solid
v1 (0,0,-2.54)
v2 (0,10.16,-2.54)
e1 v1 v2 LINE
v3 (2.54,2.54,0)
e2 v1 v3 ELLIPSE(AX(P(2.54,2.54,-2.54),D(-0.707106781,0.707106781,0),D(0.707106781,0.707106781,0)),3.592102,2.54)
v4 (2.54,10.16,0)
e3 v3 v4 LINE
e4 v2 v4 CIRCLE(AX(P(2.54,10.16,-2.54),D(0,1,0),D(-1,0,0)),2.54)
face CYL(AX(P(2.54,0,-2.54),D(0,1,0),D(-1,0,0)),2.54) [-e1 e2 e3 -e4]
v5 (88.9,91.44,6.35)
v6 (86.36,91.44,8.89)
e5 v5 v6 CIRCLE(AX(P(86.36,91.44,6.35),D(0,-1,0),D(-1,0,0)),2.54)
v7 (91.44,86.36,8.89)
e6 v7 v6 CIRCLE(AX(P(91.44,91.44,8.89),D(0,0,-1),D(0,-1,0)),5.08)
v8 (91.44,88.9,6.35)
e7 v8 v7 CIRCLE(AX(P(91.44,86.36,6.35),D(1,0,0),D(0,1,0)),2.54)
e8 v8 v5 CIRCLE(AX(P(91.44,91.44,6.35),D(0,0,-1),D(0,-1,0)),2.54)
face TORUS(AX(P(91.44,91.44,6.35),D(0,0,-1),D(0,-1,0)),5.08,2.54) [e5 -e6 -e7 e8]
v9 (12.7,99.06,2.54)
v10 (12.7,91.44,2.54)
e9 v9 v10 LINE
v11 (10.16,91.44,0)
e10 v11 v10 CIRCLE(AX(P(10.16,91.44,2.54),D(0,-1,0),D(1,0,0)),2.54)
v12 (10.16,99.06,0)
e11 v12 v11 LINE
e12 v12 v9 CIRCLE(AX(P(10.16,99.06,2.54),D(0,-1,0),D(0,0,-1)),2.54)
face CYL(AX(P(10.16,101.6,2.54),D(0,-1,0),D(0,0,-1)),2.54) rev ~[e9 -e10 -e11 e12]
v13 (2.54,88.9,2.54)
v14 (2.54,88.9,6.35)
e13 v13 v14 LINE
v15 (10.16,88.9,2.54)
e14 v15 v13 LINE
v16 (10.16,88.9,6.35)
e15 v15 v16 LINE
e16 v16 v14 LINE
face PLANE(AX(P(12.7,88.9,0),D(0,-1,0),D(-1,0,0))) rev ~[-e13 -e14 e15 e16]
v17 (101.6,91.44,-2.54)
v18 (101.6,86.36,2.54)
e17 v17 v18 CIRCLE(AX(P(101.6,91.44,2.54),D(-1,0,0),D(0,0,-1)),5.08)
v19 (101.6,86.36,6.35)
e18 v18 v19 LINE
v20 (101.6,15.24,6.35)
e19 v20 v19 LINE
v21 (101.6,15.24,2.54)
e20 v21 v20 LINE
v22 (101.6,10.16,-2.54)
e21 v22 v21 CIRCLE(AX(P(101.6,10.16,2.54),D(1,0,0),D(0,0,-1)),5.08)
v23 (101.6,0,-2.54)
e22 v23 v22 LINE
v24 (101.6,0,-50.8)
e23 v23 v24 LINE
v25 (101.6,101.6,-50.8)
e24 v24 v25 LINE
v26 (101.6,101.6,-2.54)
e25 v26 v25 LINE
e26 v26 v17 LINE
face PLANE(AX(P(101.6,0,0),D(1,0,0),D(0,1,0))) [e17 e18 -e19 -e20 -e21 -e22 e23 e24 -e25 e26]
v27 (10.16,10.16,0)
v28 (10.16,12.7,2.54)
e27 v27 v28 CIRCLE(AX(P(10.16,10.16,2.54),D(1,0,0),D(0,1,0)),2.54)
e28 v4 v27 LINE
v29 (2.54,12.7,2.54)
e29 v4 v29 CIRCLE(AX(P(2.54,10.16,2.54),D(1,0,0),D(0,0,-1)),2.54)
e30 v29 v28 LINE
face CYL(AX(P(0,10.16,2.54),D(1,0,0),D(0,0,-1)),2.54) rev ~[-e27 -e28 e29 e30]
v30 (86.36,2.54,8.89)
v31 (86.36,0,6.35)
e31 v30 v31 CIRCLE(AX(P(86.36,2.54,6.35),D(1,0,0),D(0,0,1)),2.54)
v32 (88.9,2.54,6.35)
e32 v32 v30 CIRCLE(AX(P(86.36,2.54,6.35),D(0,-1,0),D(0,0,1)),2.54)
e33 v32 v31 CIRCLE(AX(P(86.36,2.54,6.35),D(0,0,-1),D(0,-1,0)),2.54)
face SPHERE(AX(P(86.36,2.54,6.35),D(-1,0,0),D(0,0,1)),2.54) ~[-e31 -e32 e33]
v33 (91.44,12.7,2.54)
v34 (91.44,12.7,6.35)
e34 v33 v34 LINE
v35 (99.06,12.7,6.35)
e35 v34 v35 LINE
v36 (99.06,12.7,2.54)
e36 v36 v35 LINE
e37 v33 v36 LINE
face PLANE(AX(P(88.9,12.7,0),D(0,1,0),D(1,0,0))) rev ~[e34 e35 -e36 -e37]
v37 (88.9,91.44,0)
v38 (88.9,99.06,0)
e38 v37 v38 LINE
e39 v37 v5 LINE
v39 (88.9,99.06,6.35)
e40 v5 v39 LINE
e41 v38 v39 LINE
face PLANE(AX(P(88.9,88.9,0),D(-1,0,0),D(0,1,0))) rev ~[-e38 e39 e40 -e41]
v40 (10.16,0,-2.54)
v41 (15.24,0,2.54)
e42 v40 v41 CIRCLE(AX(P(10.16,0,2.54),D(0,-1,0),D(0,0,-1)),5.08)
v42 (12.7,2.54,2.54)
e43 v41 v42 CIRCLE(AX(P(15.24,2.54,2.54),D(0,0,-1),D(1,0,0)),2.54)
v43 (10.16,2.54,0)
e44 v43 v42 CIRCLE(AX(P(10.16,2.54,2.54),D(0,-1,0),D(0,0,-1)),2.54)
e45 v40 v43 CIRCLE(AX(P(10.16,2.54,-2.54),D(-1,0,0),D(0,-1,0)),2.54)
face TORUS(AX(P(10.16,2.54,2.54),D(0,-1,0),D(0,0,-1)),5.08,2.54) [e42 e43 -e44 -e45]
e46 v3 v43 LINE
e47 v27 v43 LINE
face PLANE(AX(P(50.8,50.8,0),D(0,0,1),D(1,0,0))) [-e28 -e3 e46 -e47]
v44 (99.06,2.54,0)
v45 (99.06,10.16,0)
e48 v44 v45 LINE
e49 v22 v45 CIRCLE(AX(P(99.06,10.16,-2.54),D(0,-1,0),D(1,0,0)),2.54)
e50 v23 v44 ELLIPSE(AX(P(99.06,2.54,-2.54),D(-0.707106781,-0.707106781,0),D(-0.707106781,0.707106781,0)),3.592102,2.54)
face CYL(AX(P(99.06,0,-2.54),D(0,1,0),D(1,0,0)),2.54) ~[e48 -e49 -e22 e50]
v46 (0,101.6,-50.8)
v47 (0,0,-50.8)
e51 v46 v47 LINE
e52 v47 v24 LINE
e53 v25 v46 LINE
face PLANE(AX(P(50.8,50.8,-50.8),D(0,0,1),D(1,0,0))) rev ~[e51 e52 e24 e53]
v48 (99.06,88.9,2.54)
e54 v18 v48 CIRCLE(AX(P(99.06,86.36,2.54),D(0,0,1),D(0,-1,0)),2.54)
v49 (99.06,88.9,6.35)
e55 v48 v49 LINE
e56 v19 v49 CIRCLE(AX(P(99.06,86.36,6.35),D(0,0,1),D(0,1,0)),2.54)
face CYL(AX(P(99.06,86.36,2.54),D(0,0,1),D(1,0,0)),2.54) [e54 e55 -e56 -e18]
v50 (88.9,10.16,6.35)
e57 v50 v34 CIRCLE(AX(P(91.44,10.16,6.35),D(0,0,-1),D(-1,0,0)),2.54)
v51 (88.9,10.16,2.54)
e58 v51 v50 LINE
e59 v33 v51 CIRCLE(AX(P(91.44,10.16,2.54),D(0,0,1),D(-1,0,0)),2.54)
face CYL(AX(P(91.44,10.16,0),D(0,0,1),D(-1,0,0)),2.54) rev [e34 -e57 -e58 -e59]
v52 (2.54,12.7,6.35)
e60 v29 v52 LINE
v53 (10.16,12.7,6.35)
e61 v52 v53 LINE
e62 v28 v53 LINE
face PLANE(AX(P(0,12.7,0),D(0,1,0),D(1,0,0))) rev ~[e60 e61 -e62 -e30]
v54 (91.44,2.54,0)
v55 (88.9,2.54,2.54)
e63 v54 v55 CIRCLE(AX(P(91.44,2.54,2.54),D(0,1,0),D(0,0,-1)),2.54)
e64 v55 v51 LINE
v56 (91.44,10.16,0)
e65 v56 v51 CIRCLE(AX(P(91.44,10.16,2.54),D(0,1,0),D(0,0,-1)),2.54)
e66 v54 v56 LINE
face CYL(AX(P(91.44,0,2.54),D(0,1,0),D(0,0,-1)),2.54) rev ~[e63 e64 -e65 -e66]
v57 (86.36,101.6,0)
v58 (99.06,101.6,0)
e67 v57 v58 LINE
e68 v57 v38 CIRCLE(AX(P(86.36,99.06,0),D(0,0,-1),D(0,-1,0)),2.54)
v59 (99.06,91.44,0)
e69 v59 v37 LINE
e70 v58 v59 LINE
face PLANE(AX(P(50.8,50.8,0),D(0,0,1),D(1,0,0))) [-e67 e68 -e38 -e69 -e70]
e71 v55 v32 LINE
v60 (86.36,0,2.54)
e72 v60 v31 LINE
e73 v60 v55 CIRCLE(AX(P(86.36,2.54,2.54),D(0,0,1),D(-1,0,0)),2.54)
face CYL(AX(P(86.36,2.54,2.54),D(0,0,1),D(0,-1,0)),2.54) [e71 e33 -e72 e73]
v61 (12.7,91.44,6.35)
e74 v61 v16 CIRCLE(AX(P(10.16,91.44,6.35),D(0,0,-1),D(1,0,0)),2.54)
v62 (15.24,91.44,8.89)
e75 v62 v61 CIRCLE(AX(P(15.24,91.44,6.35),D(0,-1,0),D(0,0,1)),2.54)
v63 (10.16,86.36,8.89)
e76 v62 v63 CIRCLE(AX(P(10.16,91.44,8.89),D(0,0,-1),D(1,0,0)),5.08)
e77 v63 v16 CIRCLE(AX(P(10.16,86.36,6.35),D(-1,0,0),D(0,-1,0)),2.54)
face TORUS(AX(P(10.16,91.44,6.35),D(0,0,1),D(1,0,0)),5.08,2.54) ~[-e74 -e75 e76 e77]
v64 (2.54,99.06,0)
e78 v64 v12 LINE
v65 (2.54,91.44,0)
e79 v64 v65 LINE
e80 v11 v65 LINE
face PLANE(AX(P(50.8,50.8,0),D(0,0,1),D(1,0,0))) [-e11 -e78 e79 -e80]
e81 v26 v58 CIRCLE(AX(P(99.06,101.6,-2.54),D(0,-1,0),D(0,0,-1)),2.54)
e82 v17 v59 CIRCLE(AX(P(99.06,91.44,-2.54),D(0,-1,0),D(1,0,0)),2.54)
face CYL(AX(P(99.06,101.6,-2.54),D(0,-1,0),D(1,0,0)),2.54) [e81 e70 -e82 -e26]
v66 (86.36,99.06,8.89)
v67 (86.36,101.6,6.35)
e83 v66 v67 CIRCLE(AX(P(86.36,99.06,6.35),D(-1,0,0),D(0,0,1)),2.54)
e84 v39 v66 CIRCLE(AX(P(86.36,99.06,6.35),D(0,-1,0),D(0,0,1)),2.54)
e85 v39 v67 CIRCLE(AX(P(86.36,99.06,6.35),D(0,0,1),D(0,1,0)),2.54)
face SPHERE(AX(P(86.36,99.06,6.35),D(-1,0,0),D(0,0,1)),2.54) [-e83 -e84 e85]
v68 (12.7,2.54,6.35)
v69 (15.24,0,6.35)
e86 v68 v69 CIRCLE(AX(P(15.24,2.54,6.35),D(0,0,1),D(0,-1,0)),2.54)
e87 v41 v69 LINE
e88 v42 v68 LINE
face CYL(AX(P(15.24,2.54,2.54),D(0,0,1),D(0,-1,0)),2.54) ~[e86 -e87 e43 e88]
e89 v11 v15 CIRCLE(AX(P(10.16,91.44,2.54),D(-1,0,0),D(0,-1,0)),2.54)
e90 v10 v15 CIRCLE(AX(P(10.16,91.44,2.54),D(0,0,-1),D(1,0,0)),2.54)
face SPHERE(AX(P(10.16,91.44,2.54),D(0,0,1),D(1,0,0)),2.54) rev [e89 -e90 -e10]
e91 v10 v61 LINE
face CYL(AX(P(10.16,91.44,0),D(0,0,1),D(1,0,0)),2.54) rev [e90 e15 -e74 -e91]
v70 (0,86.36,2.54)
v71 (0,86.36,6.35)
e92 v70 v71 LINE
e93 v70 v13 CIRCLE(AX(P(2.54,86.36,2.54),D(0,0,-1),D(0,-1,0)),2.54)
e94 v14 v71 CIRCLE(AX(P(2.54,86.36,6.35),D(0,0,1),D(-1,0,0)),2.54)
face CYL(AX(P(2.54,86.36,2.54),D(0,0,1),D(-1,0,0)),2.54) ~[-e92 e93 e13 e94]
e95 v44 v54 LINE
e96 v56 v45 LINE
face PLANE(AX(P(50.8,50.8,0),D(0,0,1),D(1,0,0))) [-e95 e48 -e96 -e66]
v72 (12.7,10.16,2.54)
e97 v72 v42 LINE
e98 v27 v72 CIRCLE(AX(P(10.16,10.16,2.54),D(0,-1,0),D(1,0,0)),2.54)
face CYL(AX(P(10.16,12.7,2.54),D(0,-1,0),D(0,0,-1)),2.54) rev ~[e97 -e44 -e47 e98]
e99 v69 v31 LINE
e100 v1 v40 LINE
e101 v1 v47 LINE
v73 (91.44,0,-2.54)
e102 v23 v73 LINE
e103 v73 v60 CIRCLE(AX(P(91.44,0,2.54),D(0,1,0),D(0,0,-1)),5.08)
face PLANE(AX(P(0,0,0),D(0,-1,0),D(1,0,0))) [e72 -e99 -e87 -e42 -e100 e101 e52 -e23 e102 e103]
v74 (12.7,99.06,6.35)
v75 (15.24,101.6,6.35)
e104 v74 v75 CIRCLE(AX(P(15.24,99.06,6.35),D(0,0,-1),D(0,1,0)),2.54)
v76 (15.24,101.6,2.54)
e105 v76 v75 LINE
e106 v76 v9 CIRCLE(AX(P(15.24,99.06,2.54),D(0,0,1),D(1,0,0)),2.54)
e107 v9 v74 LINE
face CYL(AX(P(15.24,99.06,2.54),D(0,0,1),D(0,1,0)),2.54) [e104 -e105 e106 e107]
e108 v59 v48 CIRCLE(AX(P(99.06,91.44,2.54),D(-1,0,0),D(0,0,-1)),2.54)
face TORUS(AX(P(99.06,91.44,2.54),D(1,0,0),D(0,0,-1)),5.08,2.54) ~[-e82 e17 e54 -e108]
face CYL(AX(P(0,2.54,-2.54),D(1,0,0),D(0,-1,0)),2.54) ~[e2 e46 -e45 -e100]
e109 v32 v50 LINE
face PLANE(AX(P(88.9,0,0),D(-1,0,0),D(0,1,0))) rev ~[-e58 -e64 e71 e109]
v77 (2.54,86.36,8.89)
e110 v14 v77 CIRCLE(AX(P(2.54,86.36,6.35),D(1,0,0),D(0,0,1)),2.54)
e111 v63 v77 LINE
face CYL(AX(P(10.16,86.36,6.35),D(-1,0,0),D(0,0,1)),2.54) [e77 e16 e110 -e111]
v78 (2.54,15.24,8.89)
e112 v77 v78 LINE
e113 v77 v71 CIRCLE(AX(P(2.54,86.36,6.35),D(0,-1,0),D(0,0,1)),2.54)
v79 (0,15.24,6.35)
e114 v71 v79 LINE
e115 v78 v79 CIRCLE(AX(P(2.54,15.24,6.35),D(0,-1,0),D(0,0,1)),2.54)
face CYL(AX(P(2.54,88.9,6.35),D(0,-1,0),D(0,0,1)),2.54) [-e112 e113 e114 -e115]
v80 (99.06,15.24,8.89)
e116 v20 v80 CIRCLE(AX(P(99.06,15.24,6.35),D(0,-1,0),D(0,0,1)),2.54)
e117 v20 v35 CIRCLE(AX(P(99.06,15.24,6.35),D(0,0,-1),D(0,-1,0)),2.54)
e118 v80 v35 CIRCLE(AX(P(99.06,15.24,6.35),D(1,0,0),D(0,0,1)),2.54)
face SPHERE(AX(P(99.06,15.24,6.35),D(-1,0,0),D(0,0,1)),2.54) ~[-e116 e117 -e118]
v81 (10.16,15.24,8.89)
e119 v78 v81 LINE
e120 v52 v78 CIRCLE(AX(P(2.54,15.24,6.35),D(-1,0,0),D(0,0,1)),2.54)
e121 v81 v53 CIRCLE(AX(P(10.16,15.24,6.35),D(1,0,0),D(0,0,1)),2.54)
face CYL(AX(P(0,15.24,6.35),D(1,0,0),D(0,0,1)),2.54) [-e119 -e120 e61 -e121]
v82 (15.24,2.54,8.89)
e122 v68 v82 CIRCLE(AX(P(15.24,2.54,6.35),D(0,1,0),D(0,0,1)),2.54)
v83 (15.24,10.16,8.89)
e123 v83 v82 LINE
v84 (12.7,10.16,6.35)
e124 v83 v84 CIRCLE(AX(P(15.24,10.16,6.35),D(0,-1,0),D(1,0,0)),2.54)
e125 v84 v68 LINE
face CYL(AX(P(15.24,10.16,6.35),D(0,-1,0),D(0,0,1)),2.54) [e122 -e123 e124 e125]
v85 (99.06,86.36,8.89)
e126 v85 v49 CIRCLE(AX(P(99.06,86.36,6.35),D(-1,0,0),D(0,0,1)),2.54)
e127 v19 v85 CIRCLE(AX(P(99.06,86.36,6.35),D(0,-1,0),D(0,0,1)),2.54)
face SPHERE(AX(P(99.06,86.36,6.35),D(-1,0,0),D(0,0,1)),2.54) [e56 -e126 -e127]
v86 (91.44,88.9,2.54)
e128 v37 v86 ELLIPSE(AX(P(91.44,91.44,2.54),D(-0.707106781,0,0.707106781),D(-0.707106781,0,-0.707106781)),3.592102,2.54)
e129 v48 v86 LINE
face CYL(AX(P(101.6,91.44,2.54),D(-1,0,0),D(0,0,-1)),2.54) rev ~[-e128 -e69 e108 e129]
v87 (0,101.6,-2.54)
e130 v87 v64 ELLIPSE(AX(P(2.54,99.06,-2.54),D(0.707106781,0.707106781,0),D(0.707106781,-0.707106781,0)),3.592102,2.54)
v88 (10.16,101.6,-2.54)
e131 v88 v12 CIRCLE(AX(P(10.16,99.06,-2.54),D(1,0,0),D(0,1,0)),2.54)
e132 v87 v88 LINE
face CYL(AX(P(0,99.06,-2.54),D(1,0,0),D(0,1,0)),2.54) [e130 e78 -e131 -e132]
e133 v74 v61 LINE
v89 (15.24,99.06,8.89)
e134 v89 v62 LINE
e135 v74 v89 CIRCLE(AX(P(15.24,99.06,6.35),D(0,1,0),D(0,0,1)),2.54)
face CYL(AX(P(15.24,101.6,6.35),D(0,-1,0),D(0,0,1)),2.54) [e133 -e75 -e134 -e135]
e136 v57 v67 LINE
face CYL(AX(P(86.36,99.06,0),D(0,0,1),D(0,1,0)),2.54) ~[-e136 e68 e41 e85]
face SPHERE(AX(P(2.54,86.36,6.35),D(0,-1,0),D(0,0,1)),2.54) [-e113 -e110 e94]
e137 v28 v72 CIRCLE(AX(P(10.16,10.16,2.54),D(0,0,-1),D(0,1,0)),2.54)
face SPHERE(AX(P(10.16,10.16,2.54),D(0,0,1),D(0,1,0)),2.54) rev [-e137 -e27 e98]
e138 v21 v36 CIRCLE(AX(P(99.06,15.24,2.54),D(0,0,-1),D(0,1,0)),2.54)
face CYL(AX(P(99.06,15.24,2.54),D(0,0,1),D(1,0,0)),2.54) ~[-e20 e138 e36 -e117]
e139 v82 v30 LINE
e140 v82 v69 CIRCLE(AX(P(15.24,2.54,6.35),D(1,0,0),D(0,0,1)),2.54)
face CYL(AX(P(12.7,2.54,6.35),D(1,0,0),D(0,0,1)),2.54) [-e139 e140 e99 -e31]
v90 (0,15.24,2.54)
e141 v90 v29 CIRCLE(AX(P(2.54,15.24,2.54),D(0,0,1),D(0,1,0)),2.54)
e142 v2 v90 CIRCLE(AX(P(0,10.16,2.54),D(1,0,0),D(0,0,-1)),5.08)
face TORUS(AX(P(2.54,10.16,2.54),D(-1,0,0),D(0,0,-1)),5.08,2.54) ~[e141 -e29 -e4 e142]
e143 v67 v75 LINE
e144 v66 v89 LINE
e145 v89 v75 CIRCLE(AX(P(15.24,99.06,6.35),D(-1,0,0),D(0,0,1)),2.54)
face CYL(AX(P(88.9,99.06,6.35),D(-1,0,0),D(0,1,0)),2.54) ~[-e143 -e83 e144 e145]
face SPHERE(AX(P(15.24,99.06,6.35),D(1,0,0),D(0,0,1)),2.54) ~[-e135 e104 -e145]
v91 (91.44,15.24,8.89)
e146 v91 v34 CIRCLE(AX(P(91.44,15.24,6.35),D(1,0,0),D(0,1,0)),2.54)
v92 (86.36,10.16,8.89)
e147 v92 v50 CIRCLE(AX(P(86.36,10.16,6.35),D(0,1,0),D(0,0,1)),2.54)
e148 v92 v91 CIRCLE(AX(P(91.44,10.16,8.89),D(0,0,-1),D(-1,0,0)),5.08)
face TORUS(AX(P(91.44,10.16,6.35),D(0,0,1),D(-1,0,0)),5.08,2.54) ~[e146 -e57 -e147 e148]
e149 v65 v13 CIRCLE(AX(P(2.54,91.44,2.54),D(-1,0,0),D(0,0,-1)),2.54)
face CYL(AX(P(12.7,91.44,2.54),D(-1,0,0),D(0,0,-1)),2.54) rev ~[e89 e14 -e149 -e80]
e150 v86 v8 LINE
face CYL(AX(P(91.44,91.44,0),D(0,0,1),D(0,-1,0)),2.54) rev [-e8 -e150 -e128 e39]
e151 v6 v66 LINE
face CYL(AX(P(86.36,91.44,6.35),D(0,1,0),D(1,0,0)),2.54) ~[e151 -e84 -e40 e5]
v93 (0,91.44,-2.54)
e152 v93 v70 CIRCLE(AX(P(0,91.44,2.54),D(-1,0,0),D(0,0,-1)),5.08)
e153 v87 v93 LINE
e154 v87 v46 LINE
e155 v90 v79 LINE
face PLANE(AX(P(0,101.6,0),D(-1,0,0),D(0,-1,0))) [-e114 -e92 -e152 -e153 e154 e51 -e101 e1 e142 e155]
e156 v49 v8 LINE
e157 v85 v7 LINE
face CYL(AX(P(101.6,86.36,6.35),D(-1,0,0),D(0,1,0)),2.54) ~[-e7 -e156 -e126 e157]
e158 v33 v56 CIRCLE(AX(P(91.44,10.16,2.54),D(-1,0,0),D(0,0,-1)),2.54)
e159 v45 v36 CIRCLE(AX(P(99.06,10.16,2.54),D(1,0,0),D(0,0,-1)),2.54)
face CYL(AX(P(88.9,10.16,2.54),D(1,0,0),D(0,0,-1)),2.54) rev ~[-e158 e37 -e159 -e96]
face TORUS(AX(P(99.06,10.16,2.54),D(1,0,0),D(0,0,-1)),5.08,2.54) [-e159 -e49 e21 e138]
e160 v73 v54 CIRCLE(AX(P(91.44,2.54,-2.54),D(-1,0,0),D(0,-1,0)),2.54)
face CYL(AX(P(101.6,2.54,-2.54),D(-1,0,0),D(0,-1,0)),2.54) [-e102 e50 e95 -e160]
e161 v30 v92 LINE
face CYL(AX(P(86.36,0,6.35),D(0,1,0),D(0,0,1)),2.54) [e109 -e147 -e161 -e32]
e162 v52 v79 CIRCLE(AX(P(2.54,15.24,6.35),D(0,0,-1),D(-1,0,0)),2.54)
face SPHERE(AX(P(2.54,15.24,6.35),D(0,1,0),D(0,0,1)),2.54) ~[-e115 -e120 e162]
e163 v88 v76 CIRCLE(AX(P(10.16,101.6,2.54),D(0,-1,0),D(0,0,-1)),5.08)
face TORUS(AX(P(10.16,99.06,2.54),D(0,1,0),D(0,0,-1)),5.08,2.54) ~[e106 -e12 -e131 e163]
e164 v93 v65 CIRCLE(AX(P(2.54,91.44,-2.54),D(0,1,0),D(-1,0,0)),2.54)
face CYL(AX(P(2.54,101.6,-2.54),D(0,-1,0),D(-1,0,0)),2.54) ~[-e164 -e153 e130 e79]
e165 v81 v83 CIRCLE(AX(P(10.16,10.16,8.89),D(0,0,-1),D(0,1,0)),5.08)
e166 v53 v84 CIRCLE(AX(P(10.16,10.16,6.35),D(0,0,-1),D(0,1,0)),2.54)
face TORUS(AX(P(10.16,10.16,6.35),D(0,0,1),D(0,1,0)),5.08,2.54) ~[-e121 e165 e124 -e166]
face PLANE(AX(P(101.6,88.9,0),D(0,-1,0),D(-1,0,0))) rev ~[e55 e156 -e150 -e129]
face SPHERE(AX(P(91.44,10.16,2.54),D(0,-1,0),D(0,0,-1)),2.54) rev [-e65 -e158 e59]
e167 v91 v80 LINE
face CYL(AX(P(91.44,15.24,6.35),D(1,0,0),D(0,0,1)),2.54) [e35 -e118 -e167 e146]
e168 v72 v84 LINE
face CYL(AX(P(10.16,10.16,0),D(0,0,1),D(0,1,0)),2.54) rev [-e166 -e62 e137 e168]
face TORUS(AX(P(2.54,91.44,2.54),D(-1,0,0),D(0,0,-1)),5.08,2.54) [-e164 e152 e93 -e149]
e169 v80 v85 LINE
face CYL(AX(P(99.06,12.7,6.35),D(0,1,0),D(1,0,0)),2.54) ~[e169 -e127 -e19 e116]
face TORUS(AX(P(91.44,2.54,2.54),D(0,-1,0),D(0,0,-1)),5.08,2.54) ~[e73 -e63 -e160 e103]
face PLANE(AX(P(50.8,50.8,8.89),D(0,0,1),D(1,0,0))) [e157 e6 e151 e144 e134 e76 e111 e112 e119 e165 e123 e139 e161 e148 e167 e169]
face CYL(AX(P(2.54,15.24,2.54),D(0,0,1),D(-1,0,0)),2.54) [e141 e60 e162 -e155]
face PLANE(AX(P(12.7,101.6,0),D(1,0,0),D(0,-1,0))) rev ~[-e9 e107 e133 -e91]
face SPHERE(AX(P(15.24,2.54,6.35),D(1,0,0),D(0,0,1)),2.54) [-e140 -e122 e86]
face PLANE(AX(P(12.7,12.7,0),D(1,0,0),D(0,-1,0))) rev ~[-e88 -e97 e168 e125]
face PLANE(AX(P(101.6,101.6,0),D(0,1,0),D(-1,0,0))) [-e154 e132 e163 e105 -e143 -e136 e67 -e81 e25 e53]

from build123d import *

# Parameters (mm, degrees)
F0_W     = 12.7
F0_H     = 12.7
F1_DEPTH = 50.8
F2_DEPTH = 8.89
F3_F1_R  = 2.54
F3_F2_R  = 2.54


with BuildPart() as f1:
    # F0 (on Top) → F1 (new body)
    with BuildSketch(Plane.XY):
        Polygon((12.7, 12.7), (12.7, 0), (88.9, 0), (88.9, 12.7), (101.6, 12.7), (101.6, 88.9), (88.9, 88.9), (88.9, 101.6), (12.7, 101.6), (12.7, 88.9), (0, 88.9), (0, 12.7), align=None)
        with Locations((6.35, 95.25)):
            Rectangle(F0_W, F0_H)
        with Locations((95.25, 95.25)):
            Rectangle(F0_W, F0_H)
        with Locations((95.25, 6.35)):
            Rectangle(F0_W, F0_H)
        with Locations((6.35, 6.35)):
            Rectangle(F0_W, F0_H)
    extrude(amount=-F1_DEPTH)

    # F0 (on Top) → F2 (join)
    with BuildSketch(Plane.XY):
        Polygon((12.7, 12.7), (12.7, 0), (88.9, 0), (88.9, 12.7), (101.6, 12.7), (101.6, 88.9), (88.9, 88.9), (88.9, 101.6), (12.7, 101.6), (12.7, 88.9), (0, 88.9), (0, 12.7), align=None)
    extrude(amount=F2_DEPTH)

    # F3: fillet of radius 2.54 on 31 edges, made by hand

    # F3_f1
    f3_f1_edges = [f1.edges().sort_by_distance(p)[0] for p in [
        (88.9, 6.35, 0),
        (95.25, 12.7, 0),
        (88.9, 12.7, 4.445),
        (12.7, 12.7, 4.445),
        (6.35, 12.7, 0),
        (12.7, 6.35, 0),
        (12.7, 88.9, 4.445),
        (12.7, 95.25, 0),
        (6.35, 88.9, 0),
        (95.25, 88.9, 0),
        (88.9, 88.9, 4.445),
    ]]
    fillet(f3_f1_edges, radius=F3_F1_R)

    # F3_f2
    f3_f2_edges = [f1.edges().sort_by_distance(p)[0] for p in [
        (50.8, 101.6, 8.89),
        (0, 50.8, 8.89),
        (50.8, 0, 8.89),
        (96.52, 88.9, 8.89),
        (5.08, 88.9, 8.89),
        (5.08, 12.7, 8.89),
        (96.52, 12.7, 8.89),
        (101.6, 50.8, 8.89),
        (88.9, 5.08, 8.89),
        (12.7, 5.08, 8.89),
        (12.7, 96.52, 8.89),
        (88.9, 96.52, 8.89),
        (88.9, 101.6, 4.445),
        (101.6, 12.7, 5.715),
        (88.9, 0, 5.715),
        (12.7, 0, 5.715),
        (0, 12.7, 5.715),
        (0, 88.9, 5.715),
        (12.7, 101.6, 5.715),
        (101.6, 88.9, 5.715),
        (101.6, 89.6439487758, 0.7439487758),
        (11.9560512242, 101.6, 0.7439487758),
        (0, 89.6439487758, 0.7439487758),
        (0, 11.9560512242, 0.7439487758),
        (11.9560512242, 0, 0.7439487758),
        (89.6439487758, 0, 0.7439487758),
        (101.6, 11.9560512242, 0.7439487758),
        (89.6439487758, 89.6439487758, 8.89),
        (11.9560512242, 89.6439487758, 8.89),
        (11.9560512242, 11.9560512242, 8.89),
        (89.6439487758, 11.9560512242, 8.89),
    ]]
    fillet(f3_f2_edges, radius=F3_F2_R)


solid = f1.part
